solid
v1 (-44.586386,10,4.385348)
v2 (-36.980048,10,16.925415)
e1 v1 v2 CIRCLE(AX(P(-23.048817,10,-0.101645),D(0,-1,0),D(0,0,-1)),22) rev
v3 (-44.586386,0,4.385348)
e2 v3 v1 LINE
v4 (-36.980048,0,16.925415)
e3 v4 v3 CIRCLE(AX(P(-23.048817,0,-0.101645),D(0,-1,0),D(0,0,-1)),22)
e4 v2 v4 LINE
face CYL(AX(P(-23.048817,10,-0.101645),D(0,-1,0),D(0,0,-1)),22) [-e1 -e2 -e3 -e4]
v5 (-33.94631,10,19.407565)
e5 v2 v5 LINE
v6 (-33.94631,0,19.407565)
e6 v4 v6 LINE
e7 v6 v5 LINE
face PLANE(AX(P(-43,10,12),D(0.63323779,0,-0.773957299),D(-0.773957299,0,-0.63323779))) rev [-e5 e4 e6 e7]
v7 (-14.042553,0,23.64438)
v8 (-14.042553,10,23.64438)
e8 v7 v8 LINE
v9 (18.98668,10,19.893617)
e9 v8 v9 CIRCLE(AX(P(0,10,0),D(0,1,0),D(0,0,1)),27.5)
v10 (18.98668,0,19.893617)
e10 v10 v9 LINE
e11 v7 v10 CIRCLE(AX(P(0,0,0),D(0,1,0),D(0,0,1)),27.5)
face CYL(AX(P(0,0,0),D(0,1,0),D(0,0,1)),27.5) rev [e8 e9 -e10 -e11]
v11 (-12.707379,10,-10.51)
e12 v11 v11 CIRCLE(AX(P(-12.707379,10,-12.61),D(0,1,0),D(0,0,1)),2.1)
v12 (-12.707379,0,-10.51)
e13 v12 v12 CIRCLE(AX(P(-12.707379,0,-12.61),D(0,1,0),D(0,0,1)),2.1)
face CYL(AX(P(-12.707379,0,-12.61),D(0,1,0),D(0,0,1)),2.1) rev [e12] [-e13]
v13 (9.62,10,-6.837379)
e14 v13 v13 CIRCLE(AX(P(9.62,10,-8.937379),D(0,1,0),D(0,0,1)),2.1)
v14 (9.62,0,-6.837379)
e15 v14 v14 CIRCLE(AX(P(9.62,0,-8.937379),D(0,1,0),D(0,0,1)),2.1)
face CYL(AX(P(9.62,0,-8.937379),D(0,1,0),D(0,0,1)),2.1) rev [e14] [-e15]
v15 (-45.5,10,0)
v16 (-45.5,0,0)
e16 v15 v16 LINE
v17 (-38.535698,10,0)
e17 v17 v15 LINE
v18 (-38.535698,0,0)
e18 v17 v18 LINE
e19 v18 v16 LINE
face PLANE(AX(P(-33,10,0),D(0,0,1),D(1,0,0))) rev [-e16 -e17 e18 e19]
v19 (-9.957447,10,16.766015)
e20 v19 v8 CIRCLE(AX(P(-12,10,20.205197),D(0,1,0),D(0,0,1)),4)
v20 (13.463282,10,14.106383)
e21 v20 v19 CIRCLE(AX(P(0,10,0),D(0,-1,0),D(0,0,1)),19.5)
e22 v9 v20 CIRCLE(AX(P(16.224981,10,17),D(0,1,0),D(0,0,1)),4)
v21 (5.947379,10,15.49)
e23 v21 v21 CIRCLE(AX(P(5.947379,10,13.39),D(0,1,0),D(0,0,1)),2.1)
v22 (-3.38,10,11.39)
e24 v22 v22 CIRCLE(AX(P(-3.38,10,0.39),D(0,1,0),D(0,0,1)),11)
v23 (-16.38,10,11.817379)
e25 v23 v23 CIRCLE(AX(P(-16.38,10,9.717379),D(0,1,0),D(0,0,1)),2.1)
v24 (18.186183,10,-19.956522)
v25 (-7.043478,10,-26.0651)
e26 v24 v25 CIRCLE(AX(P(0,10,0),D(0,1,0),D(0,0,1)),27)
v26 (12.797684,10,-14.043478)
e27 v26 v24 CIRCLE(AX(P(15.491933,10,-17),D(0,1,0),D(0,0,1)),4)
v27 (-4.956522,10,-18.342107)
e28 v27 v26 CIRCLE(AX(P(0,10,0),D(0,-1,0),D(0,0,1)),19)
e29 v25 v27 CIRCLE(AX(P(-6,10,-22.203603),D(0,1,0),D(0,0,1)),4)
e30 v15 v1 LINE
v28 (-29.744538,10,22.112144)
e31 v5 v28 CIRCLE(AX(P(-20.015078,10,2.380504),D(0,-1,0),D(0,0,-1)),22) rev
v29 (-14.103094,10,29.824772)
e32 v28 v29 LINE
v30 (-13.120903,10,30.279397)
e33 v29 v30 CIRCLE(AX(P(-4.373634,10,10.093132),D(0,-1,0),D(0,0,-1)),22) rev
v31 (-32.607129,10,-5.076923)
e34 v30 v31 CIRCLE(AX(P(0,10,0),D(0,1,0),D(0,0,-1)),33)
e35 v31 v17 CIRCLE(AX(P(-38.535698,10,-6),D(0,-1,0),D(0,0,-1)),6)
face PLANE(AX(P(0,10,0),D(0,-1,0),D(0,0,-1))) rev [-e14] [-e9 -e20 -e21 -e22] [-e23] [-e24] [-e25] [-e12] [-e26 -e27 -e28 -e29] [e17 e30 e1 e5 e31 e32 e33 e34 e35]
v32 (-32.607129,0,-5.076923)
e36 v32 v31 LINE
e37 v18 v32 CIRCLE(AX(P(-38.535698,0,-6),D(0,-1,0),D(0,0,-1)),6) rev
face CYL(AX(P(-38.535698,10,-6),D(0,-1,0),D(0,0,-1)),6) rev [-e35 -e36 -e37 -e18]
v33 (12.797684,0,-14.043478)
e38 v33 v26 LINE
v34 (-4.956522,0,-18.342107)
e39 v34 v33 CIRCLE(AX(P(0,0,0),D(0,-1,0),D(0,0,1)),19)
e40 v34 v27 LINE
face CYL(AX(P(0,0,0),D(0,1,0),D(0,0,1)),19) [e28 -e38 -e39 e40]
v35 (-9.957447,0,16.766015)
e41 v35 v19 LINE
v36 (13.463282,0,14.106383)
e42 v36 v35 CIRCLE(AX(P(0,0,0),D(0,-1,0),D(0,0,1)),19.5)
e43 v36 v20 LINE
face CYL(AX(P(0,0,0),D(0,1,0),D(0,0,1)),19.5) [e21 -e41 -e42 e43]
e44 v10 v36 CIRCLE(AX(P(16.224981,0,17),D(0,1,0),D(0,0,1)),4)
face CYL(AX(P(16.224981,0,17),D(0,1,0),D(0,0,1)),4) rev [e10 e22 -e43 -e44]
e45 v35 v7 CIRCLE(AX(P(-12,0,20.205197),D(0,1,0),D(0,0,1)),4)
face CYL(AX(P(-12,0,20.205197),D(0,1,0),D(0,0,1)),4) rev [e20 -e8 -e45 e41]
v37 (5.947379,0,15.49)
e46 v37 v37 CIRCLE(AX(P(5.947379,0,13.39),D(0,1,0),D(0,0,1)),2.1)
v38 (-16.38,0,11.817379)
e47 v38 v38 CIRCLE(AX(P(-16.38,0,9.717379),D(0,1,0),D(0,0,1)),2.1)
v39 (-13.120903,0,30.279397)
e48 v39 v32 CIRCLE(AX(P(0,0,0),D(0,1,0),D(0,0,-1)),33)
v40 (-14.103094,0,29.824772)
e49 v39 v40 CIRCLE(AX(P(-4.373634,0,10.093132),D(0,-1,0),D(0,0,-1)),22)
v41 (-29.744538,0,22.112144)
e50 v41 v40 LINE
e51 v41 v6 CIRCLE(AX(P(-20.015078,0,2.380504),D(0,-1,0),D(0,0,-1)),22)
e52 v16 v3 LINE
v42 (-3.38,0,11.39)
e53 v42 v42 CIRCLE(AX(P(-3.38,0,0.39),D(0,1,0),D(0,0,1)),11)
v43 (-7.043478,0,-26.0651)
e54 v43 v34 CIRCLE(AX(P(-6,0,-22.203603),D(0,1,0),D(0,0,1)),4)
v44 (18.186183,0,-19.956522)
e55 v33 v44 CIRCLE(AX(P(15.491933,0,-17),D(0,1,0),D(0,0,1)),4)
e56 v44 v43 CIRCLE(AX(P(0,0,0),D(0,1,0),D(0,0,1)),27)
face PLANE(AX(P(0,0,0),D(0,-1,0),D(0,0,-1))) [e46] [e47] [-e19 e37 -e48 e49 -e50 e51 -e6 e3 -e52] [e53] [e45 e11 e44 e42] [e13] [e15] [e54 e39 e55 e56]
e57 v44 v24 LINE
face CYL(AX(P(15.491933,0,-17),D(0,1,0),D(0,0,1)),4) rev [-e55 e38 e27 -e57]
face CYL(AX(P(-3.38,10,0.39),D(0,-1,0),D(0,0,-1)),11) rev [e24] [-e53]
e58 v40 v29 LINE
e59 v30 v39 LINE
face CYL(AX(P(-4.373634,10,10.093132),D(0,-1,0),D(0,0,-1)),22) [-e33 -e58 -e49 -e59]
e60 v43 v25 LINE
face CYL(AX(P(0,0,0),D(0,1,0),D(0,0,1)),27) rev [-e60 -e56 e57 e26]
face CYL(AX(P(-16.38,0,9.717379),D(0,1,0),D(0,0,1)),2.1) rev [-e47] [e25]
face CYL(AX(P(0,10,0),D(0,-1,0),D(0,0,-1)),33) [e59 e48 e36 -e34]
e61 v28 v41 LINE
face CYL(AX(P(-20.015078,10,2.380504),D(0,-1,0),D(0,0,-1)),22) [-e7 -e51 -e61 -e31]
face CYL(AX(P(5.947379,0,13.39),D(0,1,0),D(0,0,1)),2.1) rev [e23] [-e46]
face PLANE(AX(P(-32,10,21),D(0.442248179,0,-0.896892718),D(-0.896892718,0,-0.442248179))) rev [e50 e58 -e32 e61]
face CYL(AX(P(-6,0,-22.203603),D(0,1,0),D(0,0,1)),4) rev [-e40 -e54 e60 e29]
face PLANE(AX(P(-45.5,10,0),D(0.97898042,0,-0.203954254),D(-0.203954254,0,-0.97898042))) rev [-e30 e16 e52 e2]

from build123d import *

# Parameters (mm, degrees)
SKETCH1_R           = 11
BOSS_EXTRUDE1_DEPTH = 10
SKETCH2_R           = 2.1
CUT_EXTRUDE1_DEPTH  = 58.089841478
CUT_EXTRUDE3_DEPTH  = 10
FILLET1_R           = 6
FILLET2_R           = 22


with BuildPart() as part:
    # Sketch1 → Boss-Extrude1 (new body)
    with BuildSketch(Plane(origin=(0, 0, 0), x_dir=(1, 0, 0), z_dir=(0, 1, 0))):
        with BuildLine():
            Line((-33, 0), (-45.5, 0))
            Line((-45.5, 0), (-43, -12))
            Line((-43, -12), (-32, -21))
            Line((-32, -21), (-13.747727085, -30))
            ThreePointArc((-13.747727085, -30), (27.772963416, 17.823089045), (-33, 0))
        make_face()
        with Locations(Location((-3.38, -0.39, 0), (0, 0, 270))):
            Circle(SKETCH1_R, mode=Mode.SUBTRACT)
    extrude(amount=BOSS_EXTRUDE1_DEPTH)

    # Sketch2 → Cut-Extrude1 (cut, through all)
    with BuildSketch(Plane(origin=(0, 10, 0), x_dir=(1, 0, 0), z_dir=(0, 1, 0))):
        with Locations(Location((9.62, 8.937379053, 0), (0, 0, 270))):
            Circle(SKETCH2_R)
        with Locations(Location((5.947379053, -13.39, 0), (0, 0, 270))):
            Circle(SKETCH2_R)
        with Locations(Location((-16.38, -9.717379053, 0), (0, 0, 270))):
            Circle(SKETCH2_R)
        with Locations(Location((-12.707379053, 12.61, 0), (0, 0, 270))):
            Circle(SKETCH2_R)
    extrude(amount=-CUT_EXTRUDE1_DEPTH, mode=Mode.SUBTRACT)

    # Sketch4 → Cut-Extrude3 (cut)
    with BuildSketch(Plane(origin=(0, 10, 0), x_dir=(1, 0, 0), z_dir=(0, 1, 0))):
        with BuildLine():
            ThreePointArc((-14.042553191, -23.644379879), (3.102926355, -27.324381933), (18.986679589, -19.893617021))
            ThreePointArc((18.986679589, -19.893617021), (19.118597761, -14.238301151), (13.46328189, -14.106382979))
            ThreePointArc((13.46328189, -14.106382979), (2.20025687, -19.375470825), (-9.957446809, -16.766014823))
            ThreePointArc((-9.957446809, -16.766014823), (-15.439182528, -18.16264416), (-14.042553191, -23.644379879))
        make_face()
        with BuildLine():
            ThreePointArc((18.186182669, 19.956521739), (6.35363251, 26.241786409), (-7.043478261, 26.065099539))
            ThreePointArc((-7.043478261, 26.065099539), (-9.861496228, 21.16012505), (-4.956521739, 18.342107083))
            ThreePointArc((-4.956521739, 18.342107083), (4.471074729, 18.466442288), (12.797684101, 14.043478261))
            ThreePointArc((12.797684101, 14.043478261), (18.448455124, 14.305750716), (18.186182669, 19.956521739))
        make_face()
    extrude(amount=-CUT_EXTRUDE3_DEPTH, mode=Mode.SUBTRACT)

    # Fillet1
    fillet1_edges = [part.edges().sort_by_distance(p)[0] for p in [
        (-33, 5, 0),
    ]]
    fillet(fillet1_edges, radius=FILLET1_R)

    # Fillet2
    # the kernel refuses this fillet: 22 mm, written as the material it takes off along each edge
    with BuildSketch(Plane(origin=(-13.747727085, -1.715684323, 30), x_dir=(0.913373582201966, 0, 0.4071224623323412), z_dir=(0, 1, 0))) as fillet2_piece_1:
        with BuildLine():
            CenterArc((0.45751582, 21.998810646), FILLET2_R, 267.776788076, 2.81898915)
            Line((-0.39592208, 0.015370429), (0, 0))
            ThreePointArc((0, 0), (0.343136865, -0.001784032), (0.686273729, 0))
        make_face()
    extrude(amount=13.431368647, mode=Mode.SUBTRACT)
    with BuildSketch(Plane(origin=(-32, -6.286877036, 21), x_dir=(-0.7739572992033206, 0, -0.6332377902572631), z_dir=(0, 1, 0))) as fillet2_piece_2:
        with BuildLine():
            CenterArc((FILLET2_R * 0.114306855208, -FILLET2_R), FILLET2_R, 90, 13.041994835)
            Line((-FILLET2_R * 0.111358301376, -FILLET2_R * 0.0257950743792), (0, 0))
            Line((0, 0), (FILLET2_R * 0.114306855208, 0))
        make_face()
    extrude(amount=22.573754073, mode=Mode.SUBTRACT)
    with BuildSketch(Plane(origin=(-43, -19.445362474, 12), x_dir=(-0.20395425411200122, 0, -0.978980419737605), z_dir=(0, 1, 0))) as fillet2_piece_3:
        with BuildLine():
            CenterArc((FILLET2_R * 0.353552044976, -FILLET2_R), FILLET2_R, 90, 38.942304205)
            Line((-FILLET2_R * 0.27498545547, -FILLET2_R * 0.222220718627), (0, 0))
            Line((0, 0), (FILLET2_R * 0.353552044976, 0))
        make_face()
    extrude(amount=48.890724947, mode=Mode.SUBTRACT)


solid = part.part
